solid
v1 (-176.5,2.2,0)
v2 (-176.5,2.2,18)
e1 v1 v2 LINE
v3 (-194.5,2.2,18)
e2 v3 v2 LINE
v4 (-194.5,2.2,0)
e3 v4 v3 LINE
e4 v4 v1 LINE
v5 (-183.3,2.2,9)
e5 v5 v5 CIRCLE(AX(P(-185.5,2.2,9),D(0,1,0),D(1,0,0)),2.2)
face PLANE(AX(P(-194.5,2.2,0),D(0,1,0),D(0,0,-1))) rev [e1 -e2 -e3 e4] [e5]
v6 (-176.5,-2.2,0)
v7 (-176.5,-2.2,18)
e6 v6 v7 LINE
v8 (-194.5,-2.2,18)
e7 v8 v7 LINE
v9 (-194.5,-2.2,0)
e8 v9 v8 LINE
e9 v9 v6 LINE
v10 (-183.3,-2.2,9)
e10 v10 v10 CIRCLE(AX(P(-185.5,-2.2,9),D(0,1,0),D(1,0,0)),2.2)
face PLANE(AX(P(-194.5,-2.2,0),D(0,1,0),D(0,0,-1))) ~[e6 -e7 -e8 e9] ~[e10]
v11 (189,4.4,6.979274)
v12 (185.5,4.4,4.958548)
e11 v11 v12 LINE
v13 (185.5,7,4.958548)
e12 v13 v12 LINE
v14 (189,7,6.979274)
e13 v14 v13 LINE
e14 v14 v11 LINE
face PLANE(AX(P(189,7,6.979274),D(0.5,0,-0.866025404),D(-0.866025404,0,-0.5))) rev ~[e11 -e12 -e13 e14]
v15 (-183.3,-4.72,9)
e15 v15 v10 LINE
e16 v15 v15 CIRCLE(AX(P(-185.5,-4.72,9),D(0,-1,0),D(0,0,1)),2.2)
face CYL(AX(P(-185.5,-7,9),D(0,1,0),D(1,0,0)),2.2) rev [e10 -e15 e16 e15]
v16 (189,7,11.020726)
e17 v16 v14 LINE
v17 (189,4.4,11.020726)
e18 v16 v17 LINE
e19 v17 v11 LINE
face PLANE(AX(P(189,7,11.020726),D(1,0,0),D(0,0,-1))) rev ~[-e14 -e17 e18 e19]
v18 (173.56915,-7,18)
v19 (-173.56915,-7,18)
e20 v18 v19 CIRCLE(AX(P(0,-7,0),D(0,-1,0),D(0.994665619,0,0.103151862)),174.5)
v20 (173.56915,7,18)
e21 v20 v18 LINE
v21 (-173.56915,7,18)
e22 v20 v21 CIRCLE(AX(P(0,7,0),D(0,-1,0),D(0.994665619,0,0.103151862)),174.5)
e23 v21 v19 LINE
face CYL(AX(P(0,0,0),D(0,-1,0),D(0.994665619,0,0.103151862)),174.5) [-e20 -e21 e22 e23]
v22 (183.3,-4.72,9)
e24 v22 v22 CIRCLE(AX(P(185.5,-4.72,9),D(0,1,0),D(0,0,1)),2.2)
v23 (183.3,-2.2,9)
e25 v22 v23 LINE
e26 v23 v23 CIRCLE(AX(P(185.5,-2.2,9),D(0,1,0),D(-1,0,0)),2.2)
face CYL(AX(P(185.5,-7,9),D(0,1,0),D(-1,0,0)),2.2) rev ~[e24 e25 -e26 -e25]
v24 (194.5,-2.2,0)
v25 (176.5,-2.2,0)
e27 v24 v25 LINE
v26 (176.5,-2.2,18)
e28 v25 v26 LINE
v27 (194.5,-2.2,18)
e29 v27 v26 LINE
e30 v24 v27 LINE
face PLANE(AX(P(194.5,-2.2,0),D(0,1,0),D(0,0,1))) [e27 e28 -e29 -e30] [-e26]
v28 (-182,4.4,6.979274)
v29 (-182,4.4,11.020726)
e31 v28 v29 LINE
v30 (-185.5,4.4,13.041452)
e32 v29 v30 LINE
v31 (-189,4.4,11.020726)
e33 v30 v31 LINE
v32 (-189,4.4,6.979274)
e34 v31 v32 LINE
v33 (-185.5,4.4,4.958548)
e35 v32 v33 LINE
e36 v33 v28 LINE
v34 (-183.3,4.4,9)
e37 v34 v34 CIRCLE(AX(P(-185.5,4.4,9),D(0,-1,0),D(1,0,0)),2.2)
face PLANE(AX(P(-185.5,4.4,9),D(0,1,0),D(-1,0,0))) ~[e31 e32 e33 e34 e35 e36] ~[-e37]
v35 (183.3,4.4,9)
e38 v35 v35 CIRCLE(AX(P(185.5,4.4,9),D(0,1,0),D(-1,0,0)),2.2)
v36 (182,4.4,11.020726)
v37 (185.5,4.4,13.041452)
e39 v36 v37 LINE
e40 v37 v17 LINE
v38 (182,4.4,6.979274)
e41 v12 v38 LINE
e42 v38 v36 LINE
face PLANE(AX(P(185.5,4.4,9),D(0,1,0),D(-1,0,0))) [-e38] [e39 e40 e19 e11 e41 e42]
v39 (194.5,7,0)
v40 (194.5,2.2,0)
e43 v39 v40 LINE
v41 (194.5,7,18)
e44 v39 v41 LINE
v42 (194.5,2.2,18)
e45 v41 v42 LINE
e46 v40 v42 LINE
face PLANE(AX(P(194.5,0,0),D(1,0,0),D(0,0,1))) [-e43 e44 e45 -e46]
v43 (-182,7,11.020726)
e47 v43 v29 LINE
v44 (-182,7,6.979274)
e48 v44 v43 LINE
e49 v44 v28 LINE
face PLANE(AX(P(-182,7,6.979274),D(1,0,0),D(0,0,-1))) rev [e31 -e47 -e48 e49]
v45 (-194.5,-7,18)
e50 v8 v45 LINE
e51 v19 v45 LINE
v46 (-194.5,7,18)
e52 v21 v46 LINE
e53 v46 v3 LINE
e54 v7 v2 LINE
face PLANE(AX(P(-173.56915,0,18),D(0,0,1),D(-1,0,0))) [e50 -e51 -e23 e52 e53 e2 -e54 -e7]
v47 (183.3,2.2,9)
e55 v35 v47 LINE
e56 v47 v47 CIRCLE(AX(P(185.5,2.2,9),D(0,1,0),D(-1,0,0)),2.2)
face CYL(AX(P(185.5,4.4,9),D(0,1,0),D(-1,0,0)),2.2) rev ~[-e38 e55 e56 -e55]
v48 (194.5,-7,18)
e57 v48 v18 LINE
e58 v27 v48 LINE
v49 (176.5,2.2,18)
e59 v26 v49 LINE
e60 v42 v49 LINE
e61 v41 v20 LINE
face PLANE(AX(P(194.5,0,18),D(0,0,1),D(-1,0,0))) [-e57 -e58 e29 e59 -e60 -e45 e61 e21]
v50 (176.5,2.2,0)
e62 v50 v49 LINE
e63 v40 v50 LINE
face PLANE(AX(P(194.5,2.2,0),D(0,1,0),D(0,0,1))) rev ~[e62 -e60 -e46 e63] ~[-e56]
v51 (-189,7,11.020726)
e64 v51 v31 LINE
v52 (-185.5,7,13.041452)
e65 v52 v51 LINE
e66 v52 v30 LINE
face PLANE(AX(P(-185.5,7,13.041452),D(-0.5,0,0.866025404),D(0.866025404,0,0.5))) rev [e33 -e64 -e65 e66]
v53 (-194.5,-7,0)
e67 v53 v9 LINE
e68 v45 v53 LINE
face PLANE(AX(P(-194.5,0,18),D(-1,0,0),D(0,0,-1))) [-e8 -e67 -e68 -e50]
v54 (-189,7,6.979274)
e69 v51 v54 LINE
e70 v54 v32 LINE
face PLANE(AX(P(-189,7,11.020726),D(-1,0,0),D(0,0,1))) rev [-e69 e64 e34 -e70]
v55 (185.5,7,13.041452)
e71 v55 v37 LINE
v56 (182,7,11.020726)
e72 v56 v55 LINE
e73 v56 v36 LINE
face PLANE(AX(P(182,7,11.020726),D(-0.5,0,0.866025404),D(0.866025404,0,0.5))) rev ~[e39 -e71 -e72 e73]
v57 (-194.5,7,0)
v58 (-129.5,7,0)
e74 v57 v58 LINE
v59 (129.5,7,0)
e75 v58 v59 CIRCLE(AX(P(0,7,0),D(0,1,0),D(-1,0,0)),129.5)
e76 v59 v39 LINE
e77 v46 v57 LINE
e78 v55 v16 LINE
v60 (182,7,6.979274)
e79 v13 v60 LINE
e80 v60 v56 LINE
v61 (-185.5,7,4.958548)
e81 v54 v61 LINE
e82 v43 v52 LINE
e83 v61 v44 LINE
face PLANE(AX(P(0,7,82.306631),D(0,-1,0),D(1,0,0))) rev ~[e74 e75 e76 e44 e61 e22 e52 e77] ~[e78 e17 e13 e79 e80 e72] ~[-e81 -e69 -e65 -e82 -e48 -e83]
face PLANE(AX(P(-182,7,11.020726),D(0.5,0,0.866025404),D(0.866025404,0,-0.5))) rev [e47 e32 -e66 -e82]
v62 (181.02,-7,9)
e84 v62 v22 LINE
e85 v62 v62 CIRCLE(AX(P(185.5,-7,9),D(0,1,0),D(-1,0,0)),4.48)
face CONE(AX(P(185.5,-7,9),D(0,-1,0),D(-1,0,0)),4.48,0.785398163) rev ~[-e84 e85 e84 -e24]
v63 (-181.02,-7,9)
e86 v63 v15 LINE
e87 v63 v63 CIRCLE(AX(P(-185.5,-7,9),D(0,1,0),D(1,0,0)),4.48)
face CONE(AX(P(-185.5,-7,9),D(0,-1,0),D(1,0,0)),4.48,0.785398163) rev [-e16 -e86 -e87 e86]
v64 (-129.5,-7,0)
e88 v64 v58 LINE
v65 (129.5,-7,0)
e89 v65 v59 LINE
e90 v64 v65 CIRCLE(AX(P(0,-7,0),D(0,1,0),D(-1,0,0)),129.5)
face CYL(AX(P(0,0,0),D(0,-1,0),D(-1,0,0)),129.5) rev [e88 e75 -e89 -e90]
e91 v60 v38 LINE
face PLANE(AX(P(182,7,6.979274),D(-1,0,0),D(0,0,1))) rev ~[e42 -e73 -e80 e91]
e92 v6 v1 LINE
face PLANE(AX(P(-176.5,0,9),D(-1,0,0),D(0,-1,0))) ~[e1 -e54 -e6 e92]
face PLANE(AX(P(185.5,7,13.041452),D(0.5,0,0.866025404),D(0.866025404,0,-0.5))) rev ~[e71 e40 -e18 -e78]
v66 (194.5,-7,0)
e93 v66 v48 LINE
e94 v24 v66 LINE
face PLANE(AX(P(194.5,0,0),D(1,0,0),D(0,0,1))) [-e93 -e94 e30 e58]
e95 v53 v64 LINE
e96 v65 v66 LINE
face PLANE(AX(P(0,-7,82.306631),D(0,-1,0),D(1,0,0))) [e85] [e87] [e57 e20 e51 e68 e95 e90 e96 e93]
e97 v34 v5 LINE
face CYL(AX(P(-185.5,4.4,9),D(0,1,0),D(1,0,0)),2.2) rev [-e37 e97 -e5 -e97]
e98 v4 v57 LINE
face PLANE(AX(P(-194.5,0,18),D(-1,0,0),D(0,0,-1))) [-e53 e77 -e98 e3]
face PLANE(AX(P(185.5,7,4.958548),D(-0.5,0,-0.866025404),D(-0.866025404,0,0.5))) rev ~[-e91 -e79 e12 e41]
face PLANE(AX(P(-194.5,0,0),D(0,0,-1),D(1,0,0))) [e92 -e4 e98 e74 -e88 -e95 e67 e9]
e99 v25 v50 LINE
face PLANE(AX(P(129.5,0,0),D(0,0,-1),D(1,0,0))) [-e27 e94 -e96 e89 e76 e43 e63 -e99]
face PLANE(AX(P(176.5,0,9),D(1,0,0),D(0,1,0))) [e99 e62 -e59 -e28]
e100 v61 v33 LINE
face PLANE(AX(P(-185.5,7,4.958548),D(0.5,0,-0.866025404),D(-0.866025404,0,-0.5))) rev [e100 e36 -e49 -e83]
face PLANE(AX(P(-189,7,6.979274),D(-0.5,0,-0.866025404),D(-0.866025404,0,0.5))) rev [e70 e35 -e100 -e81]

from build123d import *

# Parameters (mm, degrees)
F1_DEPTH       = 7
F2_DEPTH       = 6
F3_W           = 4.4
F3_H           = 18
F4_DEPTH       = 18
F6_D           = 4.4
F6_DEPTH       = 5
F6_CSINK_D     = 8.96
F6_CSINK_ANGLE = 90
F6_TIP         = 1.3218933619
F8_DEPTH       = 2.6
F9_R           = 2.2
F10_DEPTH      = 2.3


# Not quite as in the source:
# - a pattern or mirror of a feature is missing from the dataset's text; its kind, count and spacing are read off the source's solid


with BuildPart() as f1:
    # F0 (on Front) → F1 (new body, symmetric)
    with BuildSketch(Plane.XZ):
        with BuildLine():
            Line((129.5, 0), (174.5, 0))
            ThreePointArc((174.5, 0), (174.2671322418, 9.0120264206), (173.5691504848, 18))
            ThreePointArc((173.5691504848, 18), (0, 174.5), (-173.5691504848, 18))
            ThreePointArc((-173.5691504848, 18), (-174.2671322418, 9.0120264206), (-174.5, 0))
            Line((-174.5, 0), (-129.5, 0))
            ThreePointArc((-129.5, 0), (0, 129.5), (129.5, 0))
        make_face()
        with BuildLine():
            ThreePointArc((173.5691504848, 18), (174.2671322418, 9.0120264206), (174.5, 0))
            Line((174.5, 0), (194.5, 0))
            Line((194.5, 0), (194.5, 18))
            Line((194.5, 18), (173.5691504848, 18))
        make_face()
        with BuildLine():
            ThreePointArc((-174.5, 0), (-174.2671322418, 9.0120264206), (-173.5691504848, 18))
            Line((-173.5691504848, 18), (-194.5, 18))
            Line((-194.5, 18), (-194.5, 0))
            Line((-194.5, 0), (-174.5, 0))
        make_face()
    extrude(amount=F1_DEPTH, both=True)

    # F0 (on Front) → F2 (join, symmetric)
    with BuildSketch(Plane.XZ):
        with BuildLine():
            Line((129.5, 0), (174.5, 0))
            ThreePointArc((174.5, 0), (174.2671322418, 9.0120264206), (173.5691504848, 18))
            ThreePointArc((173.5691504848, 18), (0, 174.5), (-173.5691504848, 18))
            ThreePointArc((-173.5691504848, 18), (-174.2671322418, 9.0120264206), (-174.5, 0))
            Line((-174.5, 0), (-129.5, 0))
            ThreePointArc((-129.5, 0), (0, 129.5), (129.5, 0))
        make_face()
        with BuildLine():
            ThreePointArc((173.5691504848, 18), (174.2671322418, 9.0120264206), (174.5, 0))
            Line((174.5, 0), (194.5, 0))
            Line((194.5, 0), (194.5, 18))
            Line((194.5, 18), (173.5691504848, 18))
        make_face()
        with BuildLine():
            ThreePointArc((-174.5, 0), (-174.2671322418, 9.0120264206), (-173.5691504848, 18))
            Line((-173.5691504848, 18), (-194.5, 18))
            Line((-194.5, 18), (-194.5, 0))
            Line((-194.5, 0), (-174.5, 0))
        make_face()
    extrude(amount=F2_DEPTH, both=True)

    # F3 (on face) → F4 (cut)
    with BuildSketch(Plane.YZ.offset(194.5)):
        with Locations((0, 9)):
            Rectangle(F3_W, F3_H)
    f4 = extrude(amount=-F4_DEPTH, mode=Mode.SUBTRACT)

    # F4_copies: F4 across plane
    add(f4.mirror(Plane(origin=(0, 0, 0), x_dir=(0, 0, -1), z_dir=(-1, 0, 0))), mode=Mode.SUBTRACT)

    # F6
    with Locations(Plane.XZ.offset(7)):
        with Locations((185.5, 9)):
            f6 = CounterSinkHole(F6_D / 2, F6_CSINK_D / 2, depth=F6_DEPTH, counter_sink_angle=F6_CSINK_ANGLE)
            with Locations((0, 0, -(F6_DEPTH + F6_TIP / 2))):  # 118° drill point
                Cone(0, F6_D / 2, F6_TIP, mode=Mode.SUBTRACT)

    # F6_copies: F6 across plane
    add(f6.mirror(Plane(origin=(0, 0, 0), x_dir=(0, 0, -1), z_dir=(-1, 0, 0))), mode=Mode.SUBTRACT)

    # F7 (on face) → F8 (cut)
    with BuildSketch(Plane(origin=(0, 7, 0), x_dir=(-1, 0, 0), z_dir=(0, 1, 0))):
        Polygon((-189, 11.0207259422), (-189, 6.9792740578), (-185.5, 4.9585481157), (-182, 6.9792740578), (-182, 11.0207259422), (-185.5, 13.0414518843), align=None)
    f8 = extrude(amount=-F8_DEPTH, mode=Mode.SUBTRACT)

    # F8_copies: F8 across plane
    add(f8.mirror(Plane(origin=(0, 0, 0), x_dir=(0, 0, -1), z_dir=(-1, 0, 0))), mode=Mode.SUBTRACT)

    # F9 (on face) → F10 (cut)
    with BuildSketch(Plane(origin=(0, 4.4, 0), x_dir=(-1, 0, 0), z_dir=(0, 1, 0))):
        with Locations((-185.5, 9)):
            Circle(F9_R)
    f10 = extrude(amount=-F10_DEPTH, mode=Mode.SUBTRACT)

    # F10_copies: F10 across plane
    add(f10.mirror(Plane(origin=(0, 0, 0), x_dir=(0, 0, -1), z_dir=(-1, 0, 0))), mode=Mode.SUBTRACT)


solid = f1.part
